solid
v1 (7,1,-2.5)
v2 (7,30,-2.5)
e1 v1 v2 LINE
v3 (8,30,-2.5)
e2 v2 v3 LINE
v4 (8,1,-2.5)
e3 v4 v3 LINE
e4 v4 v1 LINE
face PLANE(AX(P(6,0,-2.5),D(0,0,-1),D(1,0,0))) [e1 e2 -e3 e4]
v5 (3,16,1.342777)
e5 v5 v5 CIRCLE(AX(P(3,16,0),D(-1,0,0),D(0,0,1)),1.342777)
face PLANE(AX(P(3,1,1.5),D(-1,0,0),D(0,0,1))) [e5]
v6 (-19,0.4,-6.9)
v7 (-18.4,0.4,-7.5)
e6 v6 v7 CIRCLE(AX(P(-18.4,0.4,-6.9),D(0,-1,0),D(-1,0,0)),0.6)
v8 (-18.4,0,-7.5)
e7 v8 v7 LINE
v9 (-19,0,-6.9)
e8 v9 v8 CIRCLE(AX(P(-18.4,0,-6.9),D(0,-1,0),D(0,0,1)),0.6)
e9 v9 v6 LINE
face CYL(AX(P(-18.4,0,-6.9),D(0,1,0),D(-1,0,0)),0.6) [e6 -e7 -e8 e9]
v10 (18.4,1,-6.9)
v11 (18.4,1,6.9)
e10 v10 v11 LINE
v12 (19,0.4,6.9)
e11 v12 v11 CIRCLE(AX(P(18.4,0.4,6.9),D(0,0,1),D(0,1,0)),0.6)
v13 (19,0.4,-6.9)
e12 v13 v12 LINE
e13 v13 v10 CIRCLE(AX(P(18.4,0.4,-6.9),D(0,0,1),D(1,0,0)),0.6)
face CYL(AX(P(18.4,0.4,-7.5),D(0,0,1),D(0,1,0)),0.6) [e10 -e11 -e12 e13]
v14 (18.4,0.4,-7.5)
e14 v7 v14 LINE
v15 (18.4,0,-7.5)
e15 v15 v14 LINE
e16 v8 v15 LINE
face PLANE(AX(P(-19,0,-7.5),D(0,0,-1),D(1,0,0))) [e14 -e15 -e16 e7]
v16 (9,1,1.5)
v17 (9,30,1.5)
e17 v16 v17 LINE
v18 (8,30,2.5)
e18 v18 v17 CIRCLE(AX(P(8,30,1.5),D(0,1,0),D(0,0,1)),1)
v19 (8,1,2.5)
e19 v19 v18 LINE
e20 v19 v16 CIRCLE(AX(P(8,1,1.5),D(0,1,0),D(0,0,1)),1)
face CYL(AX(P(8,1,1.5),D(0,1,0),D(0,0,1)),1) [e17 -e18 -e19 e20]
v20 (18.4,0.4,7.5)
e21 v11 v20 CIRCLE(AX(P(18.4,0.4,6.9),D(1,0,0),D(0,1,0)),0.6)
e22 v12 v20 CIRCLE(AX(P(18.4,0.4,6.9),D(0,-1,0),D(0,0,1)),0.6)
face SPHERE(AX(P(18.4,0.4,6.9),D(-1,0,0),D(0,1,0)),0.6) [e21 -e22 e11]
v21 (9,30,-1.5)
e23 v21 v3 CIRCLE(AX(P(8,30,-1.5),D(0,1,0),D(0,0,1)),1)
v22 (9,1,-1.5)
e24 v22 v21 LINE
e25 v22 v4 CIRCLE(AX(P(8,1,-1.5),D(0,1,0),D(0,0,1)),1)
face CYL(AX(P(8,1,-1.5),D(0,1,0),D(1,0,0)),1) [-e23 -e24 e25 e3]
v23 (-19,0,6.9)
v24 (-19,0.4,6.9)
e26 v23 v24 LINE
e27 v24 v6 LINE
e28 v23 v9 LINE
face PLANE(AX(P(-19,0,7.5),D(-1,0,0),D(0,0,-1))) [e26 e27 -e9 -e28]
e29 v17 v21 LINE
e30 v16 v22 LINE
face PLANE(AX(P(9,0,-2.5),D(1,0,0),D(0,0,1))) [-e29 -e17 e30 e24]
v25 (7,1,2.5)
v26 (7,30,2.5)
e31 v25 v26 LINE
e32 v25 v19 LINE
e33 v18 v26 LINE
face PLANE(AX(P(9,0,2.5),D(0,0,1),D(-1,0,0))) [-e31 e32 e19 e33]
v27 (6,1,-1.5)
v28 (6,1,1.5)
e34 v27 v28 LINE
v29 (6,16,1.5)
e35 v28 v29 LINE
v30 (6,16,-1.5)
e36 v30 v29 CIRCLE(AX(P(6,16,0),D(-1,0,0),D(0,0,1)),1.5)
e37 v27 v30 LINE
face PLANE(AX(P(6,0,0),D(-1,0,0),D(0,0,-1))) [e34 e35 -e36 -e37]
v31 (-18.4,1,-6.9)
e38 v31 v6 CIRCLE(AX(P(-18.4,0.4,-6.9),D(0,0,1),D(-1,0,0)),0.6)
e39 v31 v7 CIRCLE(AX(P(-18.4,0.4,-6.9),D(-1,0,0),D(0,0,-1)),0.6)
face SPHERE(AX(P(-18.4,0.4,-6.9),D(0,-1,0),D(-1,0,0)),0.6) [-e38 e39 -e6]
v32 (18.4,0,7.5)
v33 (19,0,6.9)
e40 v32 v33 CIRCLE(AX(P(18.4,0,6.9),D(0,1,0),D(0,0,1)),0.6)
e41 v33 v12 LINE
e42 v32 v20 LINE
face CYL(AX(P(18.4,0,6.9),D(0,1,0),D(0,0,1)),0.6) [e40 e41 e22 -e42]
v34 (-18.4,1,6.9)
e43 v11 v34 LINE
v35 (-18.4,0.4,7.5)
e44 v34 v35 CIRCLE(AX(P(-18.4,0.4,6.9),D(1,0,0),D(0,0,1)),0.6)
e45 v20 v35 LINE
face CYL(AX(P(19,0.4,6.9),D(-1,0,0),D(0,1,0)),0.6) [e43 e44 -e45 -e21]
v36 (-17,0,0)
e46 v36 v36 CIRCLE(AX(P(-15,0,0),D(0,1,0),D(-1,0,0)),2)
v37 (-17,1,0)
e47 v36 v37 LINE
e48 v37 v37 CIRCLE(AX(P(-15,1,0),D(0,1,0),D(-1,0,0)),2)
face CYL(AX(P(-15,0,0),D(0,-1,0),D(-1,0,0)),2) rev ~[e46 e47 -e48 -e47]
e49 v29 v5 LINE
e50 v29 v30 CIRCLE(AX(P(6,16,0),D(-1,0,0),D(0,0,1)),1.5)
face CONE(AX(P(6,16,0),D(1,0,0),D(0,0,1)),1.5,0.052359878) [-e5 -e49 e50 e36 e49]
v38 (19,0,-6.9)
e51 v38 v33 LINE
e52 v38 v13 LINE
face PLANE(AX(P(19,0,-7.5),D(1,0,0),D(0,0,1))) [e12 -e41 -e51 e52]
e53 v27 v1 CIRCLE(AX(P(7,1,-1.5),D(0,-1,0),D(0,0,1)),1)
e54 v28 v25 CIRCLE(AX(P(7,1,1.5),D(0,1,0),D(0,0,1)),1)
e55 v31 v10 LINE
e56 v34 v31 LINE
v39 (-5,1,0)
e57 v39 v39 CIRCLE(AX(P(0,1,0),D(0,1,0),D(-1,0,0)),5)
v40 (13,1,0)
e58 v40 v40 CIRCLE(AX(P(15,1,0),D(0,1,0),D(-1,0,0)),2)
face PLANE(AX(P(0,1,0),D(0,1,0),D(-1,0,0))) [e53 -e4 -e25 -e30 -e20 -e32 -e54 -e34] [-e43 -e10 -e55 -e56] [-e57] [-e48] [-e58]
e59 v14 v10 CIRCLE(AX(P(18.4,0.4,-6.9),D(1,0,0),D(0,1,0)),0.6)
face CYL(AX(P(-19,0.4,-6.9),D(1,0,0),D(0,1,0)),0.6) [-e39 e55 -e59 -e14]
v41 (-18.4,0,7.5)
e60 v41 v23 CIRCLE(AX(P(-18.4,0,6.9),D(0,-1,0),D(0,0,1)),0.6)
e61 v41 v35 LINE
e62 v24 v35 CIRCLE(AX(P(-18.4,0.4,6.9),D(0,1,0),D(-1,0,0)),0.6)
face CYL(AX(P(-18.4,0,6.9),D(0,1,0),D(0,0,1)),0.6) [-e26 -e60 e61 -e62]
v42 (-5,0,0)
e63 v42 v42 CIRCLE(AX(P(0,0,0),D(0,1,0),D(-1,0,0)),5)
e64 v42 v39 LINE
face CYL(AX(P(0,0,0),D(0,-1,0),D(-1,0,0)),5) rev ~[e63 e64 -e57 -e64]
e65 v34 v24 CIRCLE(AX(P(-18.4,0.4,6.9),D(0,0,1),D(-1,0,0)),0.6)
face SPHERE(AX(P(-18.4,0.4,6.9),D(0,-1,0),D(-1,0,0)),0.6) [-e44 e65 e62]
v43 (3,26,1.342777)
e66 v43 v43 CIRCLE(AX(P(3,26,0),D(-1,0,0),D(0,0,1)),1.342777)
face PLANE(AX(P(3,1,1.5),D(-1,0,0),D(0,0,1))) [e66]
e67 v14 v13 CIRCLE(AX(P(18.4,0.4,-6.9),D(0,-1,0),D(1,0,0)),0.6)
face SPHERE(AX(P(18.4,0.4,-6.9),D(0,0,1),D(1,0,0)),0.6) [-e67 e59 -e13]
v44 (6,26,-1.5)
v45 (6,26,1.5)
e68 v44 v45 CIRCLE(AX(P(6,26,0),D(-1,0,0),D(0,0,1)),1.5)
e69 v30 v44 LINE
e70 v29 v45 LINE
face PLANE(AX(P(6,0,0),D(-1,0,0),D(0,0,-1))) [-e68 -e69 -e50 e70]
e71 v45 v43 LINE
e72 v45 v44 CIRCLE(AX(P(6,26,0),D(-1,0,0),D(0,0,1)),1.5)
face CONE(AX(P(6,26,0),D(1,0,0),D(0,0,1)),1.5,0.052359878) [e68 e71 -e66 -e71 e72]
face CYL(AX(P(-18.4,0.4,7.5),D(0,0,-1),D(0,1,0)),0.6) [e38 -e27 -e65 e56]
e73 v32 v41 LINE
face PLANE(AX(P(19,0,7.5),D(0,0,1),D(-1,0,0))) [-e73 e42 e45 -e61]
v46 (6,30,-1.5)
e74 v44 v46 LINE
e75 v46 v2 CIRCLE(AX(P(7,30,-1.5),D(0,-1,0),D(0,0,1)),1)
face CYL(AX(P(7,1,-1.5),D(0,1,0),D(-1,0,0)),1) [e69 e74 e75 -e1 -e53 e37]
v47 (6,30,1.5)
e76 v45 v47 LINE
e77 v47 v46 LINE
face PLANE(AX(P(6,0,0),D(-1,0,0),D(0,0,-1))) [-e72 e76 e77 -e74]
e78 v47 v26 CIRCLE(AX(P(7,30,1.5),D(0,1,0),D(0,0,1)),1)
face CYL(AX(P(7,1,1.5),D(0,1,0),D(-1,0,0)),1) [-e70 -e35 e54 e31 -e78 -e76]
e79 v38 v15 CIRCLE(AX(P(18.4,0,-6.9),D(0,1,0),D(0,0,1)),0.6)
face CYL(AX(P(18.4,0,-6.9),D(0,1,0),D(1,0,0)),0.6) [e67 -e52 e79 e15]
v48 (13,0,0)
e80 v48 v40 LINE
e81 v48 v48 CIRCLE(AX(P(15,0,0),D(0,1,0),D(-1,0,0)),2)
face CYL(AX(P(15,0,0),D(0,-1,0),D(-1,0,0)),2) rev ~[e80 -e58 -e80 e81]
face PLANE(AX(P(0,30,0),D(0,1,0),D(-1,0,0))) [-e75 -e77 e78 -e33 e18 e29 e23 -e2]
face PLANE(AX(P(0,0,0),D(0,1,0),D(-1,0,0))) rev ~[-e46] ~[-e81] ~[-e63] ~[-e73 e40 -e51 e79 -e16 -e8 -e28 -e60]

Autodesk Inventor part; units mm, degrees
ref_plane "YZ Plane" through (0, 0, 0) normal (1, 0, 0) x (0, 1, 0)
ref_plane "XZ Plane" through (0, 0, 0) normal (0, 1, 0) x (-1, 0, 0)
ref_plane "XY Plane" through (0, 0, 0) normal (0, 0, 1) x (1, 0, 0)
sketch "Szkic1" plane through (0, 0, 0) normal (0, 1, 0) x (-1, 0, 0)
  line L0 (0, 0) -> (-15, 0)
  line L1 (0, 0) -> (15, 0)
  circle A0 centre (0, 0) radius 5
  circle A1 centre (15, 0) radius 2
  circle A2 centre (-15, 0) radius 2
  line L2 (-19, 7.5) -> (19, 7.5)
  line L3 (19, 7.5) -> (19, -7.5)
  line L4 (19, -7.5) -> (-19, -7.5)
  line L5 (-19, -7.5) -> (-19, 7.5)
  line L6 (-19, 7.5) -> (19, -7.5) construction
  line L7 (19, 7.5) -> (-19, -7.5) construction
  line L8 (0, 0) -> (15, 0)
  line L9 (6, 2.5) -> (9, 2.5)
  line L10 (9, 2.5) -> (9, -2.5)
  line L11 (9, -2.5) -> (6, -2.5)
  line L12 (6, -2.5) -> (6, 2.5)
  line L13 (6, 2.5) -> (9, -2.5) construction
  line L14 (9, 2.5) -> (6, -2.5) construction
  line L15 (-9, 2.5) -> (-6, 2.5)
  line L16 (-6, 2.5) -> (-6, -2.5)
  line L17 (-6, -2.5) -> (-9, -2.5)
  line L18 (-9, -2.5) -> (-9, 2.5)
  line L19 (-9, 2.5) -> (-6, -2.5) construction
  line L20 (-6, 2.5) -> (-9, -2.5) construction
  point P0 (7.5, 0)
  point P1 (-7.5, 0)
  point P2 (-5, 0)
  point P3 (5, 0)
  dimension "d0" = 15
  dimension "d1" = 15
  dimension "d2" = 10
  dimension "d3" = 4
  dimension "d4" = 4
  dimension "d5" = 38
  dimension "d6" = 15
  dimension "d7" = 3
  dimension "d8" = 5
  dimension "d9" = 3
  dimension "d10" = 5
extrude "Wyciągnięcie proste1" add sketch "Szkic1" along normal blind 1 contours L16 L17 L18 L0 | L0 L18 L15 L16 | L12 L9 L10 L1 | L1 L10 L11 L12 | L2 L3 L4 L5
extrude "Wyciągnięcie proste2" add sketch "Szkic1" along normal blind 30 contours L16 L17 L18 L0 | L0 L18 L15 L16
sketch "Szkic2" plane through (-6, 1, -2.5) normal (1, 0, 0) x (0, 0, -1)
  line L0 (0, 19) -> (-5, 19)
  line L1 (0, 19) -> (-2.12132, 16.87868)
  line L2 (0, 19) -> (3, 19) construction
  circle A0 centre (-2.12132, 16.87868) radius 1.5
  point P0 (-2.5, -1)
  dimension "d15" = 3
  dimension "d16" = 135
  dimension "d17" = 3
extrude "Wyciągnięcie proste3" [suppressed]
fillet "Zaokrąglenie1" radius 1 4 edges at (6, 15.5, -2.5) (9, 15.5, -2.5) (9, 15.5, 2.5) (6, 15.5, 2.5)
sketch "Szkic3" plane through (6, 1, 1.5) normal (-1, 0, 0) x (0, 0, 1)
  line L0 (-1.5, 27) -> (-1.5, 25)
  circle A0 centre (-1.5, 25) radius 1.5
  line L1 (-1.5, 25) -> (-1.5, 15)
  circle A1 centre (-1.5, 15) radius 1.5
  line L2 (-3, 29) -> (0, 29) projected
  point P0 (-1.5, -1)
  point P1 (0, 19)
  point P2 (-3, 19)
  point P3 (-1.5, 29)
  dimension "d21" = 2
  dimension "d22" = 3
  dimension "d23" = 10
  dimension "d24" = 3
  dimension "d28" = 2
sketch "Szkic3 outline for Wyciągnięcie proste4" plane through (6, 1, 1.5) normal (-1, 0, 0) x (0, 0, 1)
  circle A0 centre (-1.5, 25) radius 1.5
  circle A1 centre (-1.5, 15) radius 1.5
extrude "Wyciągnięcie proste4" add sketch "Szkic3 outline for Wyciągnięcie proste4" along normal blind 3 draft -3
fillet "Zaokrąglenie2" radius 0.6 8 edges at (-19, 0.5, 7.5) (-19, 0.5, -7.5) (-19, 1, 0) (0, 1, 7.5) (19, 1, 0) (19, 0.5, 7.5) (19, 0.5, -7.5) (0, 1, -7.5)
properties part number "sensor_holder" material "Tworzywo sztuczne ABS"
